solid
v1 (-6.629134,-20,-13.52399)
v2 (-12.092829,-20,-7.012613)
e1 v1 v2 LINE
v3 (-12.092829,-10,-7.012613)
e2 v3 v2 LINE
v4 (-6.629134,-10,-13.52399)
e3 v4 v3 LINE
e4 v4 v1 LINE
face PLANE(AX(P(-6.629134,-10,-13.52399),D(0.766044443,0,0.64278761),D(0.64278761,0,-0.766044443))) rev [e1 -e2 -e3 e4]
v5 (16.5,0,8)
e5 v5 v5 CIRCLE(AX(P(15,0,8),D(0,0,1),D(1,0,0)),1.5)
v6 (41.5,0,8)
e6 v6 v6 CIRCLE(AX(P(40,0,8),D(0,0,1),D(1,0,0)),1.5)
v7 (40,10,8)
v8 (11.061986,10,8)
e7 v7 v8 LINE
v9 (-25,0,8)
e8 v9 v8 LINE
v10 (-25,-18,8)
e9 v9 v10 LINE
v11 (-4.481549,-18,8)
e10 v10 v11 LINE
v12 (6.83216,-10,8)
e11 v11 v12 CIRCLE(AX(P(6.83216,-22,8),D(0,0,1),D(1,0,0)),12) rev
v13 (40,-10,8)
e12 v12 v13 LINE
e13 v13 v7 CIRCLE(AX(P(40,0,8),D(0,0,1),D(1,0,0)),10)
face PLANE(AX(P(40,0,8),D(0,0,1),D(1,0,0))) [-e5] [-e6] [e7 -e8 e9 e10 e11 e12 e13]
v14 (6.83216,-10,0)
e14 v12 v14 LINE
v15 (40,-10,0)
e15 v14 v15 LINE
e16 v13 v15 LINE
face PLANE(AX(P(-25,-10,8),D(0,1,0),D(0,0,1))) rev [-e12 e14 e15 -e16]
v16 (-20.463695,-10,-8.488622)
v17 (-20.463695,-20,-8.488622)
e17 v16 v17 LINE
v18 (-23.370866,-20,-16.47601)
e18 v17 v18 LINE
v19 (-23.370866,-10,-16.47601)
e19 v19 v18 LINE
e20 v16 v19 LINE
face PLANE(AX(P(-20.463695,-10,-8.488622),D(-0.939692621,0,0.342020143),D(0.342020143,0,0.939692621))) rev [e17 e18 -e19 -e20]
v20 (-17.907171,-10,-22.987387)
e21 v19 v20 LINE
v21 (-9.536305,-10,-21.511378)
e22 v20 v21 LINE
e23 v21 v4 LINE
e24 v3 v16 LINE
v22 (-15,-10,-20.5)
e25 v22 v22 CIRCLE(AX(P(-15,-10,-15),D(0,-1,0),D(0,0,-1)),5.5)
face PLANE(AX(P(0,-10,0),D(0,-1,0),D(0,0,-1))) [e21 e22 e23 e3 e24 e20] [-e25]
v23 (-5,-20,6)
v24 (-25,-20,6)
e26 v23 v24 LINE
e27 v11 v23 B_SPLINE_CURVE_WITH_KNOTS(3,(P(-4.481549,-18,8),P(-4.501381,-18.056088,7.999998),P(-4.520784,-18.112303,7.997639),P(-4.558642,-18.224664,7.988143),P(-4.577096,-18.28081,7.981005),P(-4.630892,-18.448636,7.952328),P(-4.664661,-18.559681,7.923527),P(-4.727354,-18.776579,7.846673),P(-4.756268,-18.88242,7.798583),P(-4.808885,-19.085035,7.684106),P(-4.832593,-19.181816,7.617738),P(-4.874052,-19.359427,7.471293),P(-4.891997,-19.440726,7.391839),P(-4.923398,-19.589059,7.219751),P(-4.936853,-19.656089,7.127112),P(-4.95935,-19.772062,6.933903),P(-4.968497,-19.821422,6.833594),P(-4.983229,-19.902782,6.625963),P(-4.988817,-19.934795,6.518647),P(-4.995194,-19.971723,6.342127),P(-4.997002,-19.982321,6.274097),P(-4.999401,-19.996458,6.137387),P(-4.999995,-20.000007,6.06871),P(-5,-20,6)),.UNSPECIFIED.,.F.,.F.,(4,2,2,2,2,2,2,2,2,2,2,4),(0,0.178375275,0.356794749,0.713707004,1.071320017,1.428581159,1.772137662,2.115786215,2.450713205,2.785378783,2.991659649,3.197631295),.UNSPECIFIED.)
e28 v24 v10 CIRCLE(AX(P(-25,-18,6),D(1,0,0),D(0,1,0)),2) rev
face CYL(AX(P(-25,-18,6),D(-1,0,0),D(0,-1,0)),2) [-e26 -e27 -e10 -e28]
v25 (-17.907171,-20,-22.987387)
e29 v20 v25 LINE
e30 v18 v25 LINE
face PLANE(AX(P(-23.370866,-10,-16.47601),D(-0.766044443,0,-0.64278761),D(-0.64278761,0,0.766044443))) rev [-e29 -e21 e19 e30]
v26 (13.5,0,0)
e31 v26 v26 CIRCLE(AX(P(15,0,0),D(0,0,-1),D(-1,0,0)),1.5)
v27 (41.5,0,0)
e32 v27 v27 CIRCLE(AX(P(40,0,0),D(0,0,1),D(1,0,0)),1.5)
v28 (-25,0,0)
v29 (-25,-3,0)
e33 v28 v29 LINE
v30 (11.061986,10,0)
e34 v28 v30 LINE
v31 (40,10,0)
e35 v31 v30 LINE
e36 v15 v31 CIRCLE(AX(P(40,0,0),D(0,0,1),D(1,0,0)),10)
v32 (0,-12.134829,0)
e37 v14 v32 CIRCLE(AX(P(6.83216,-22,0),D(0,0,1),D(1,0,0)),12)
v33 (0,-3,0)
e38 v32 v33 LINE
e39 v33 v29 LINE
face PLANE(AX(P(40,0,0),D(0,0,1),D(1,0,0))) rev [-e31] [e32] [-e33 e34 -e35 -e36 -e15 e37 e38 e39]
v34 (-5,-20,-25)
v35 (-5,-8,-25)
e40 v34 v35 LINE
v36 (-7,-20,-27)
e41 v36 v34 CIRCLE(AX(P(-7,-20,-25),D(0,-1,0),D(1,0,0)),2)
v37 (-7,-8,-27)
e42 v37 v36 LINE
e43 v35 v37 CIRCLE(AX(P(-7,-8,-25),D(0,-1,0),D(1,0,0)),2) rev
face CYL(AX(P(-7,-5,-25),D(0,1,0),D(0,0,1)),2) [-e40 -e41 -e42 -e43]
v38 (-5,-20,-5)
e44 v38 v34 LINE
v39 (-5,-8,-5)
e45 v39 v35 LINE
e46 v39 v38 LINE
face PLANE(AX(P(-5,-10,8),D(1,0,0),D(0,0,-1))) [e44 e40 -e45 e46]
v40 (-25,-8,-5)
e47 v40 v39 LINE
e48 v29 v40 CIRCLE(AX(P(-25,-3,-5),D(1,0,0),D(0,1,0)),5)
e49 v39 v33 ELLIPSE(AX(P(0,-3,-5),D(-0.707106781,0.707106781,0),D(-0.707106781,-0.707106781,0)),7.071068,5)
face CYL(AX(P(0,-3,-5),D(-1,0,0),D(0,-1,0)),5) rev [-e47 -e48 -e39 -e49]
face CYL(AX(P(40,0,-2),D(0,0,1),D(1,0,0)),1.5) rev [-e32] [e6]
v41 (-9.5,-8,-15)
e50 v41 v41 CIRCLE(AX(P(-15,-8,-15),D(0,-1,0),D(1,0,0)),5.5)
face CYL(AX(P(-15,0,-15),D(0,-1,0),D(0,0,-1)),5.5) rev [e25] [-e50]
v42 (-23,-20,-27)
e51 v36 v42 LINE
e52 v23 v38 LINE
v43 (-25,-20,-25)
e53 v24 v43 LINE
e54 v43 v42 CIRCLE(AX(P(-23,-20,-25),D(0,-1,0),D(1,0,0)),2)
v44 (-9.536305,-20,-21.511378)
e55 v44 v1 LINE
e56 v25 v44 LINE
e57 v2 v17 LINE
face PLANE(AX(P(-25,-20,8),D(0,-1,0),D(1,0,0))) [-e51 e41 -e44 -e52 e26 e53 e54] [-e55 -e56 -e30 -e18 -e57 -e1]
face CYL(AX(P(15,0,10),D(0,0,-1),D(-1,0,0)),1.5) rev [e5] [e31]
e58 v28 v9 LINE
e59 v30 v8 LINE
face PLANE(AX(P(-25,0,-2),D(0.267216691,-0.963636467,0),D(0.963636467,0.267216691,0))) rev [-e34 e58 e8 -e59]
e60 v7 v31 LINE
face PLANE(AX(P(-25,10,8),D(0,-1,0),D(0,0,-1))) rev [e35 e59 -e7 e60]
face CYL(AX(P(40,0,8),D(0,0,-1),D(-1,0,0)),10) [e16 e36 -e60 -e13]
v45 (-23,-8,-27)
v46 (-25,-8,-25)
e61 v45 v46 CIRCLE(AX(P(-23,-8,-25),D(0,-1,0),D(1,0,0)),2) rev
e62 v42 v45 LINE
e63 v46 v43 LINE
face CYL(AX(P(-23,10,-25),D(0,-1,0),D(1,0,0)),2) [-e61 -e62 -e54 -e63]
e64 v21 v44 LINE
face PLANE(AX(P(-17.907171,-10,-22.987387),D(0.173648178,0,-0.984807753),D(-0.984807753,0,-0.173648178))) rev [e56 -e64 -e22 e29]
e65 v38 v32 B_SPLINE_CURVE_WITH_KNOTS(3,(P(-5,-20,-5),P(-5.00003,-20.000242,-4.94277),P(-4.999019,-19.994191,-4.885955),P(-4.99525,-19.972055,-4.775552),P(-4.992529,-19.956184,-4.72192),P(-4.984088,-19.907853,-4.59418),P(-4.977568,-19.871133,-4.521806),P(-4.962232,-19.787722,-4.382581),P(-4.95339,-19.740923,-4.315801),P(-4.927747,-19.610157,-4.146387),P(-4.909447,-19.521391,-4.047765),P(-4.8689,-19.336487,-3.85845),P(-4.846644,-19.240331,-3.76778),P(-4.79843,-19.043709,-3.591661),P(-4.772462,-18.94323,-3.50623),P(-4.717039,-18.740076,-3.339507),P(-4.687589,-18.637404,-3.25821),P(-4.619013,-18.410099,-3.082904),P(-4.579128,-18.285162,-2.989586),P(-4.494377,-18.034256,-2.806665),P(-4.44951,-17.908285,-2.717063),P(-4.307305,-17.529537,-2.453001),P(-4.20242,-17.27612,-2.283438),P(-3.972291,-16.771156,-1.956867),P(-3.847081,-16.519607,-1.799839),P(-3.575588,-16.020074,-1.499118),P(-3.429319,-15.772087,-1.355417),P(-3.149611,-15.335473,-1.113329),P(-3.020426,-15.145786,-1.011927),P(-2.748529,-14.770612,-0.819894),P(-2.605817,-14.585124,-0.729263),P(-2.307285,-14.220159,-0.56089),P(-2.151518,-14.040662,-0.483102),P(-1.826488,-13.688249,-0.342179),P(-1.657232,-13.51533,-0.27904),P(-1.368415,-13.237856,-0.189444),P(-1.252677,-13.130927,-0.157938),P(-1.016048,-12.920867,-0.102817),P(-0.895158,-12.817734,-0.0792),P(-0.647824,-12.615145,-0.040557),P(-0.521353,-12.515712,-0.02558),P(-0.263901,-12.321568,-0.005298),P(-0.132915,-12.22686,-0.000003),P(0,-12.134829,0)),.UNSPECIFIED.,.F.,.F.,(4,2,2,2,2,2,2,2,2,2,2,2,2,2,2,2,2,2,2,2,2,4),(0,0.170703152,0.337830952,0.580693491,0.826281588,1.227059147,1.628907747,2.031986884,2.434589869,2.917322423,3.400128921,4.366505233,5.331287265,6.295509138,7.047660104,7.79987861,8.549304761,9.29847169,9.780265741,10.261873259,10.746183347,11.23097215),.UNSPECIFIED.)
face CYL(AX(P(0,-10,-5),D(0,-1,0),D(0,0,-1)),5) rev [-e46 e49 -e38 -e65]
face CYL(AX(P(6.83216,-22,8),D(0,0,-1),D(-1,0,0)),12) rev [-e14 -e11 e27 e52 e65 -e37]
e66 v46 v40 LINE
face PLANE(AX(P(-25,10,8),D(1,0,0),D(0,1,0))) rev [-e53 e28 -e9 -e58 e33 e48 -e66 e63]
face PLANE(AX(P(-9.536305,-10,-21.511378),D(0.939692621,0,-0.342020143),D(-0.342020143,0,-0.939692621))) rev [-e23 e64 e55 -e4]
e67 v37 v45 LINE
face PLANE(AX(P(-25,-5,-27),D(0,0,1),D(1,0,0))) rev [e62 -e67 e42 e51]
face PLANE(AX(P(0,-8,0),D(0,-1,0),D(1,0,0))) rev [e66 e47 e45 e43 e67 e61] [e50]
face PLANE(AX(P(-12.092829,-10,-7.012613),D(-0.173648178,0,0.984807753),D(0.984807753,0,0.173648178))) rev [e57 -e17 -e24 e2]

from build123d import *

# Parameters (mm, degrees)
BOSS_EXTRUDE1_DEPTH      = 8
SKETCH2_R                = 1.5
CUT_EXTRUDE1_DEPTH       = 10
SKETCH3_R                = 1.5
CUT_EXTRUDE2_DEPTH       = 10
BOSS_EXTRUDE3_DEPTH      = 30
BOSS_EXTRUDE3_DEPTH_BACK = 8
SKETCH6_W                = 20
SKETCH6_H                = 10
FILLET3_R                = 12
SKETCH7_W                = 20
SKETCH7_H                = 30
BOSS_EXTRUDE4_DEPTH      = 2
CUT_EXTRUDE3_DEPTH       = 10
SKETCH9_R                = 5.5
CUT_EXTRUDE4_DEPTH       = 10
FILLET4_R                = 5
FILLET5_R                = 2
CUT_EXTRUDE5_DEPTH       = 10
SKETCH11_W               = 20
SKETCH11_H               = 3
CUT_EXTRUDE6_DEPTH       = 15
FILLET6_R                = 2


with BuildPart() as part:
    # Sketch1 → Boss-Extrude1 (new body)
    with BuildSketch(Plane.XY):
        with BuildLine():
            Line((-25, 10), (40, 10))
            ThreePointArc((40, 10), (50, 0), (40, -10))
            Line((40, -10), (-25, -10))
            Line((-25, -10), (-25, 10))
        make_face()
    extrude(amount=BOSS_EXTRUDE1_DEPTH)

    # Sketch2 → Cut-Extrude1 (cut)
    with BuildSketch(Plane.XY.offset(8)):
        with Locations((40, 0)):
            Circle(SKETCH2_R)
    extrude(amount=-CUT_EXTRUDE1_DEPTH, mode=Mode.SUBTRACT)

    # Sketch3 → Cut-Extrude2 (cut)
    with BuildSketch(Plane(origin=(0, 0, 0), x_dir=(-1, 0, 0), z_dir=(0, 0, -1))):
        with Locations((-15, 0)):
            Circle(SKETCH3_R)
    extrude(amount=-CUT_EXTRUDE2_DEPTH, mode=Mode.SUBTRACT)

    # Sketch6 → Boss-Extrude3 (add, two sides: drawn at the far end of the back side and taken through both)
    with BuildSketch(Plane(origin=(0, 0, 0), x_dir=(-1, 0, 0), z_dir=(0, 0, -1)).offset(-BOSS_EXTRUDE3_DEPTH_BACK)):
        with Locations((15, -15)):
            Rectangle(SKETCH6_W, SKETCH6_H)
    extrude(amount=BOSS_EXTRUDE3_DEPTH + BOSS_EXTRUDE3_DEPTH_BACK)

    # Fillet3
    # the kernel refuses this fillet: 12 mm, written as the material it adds along each edge
    with BuildSketch(Plane(origin=(-5, -10, 8), x_dir=(0, -1, 0), z_dir=(0, 0, -1))) as fillet3_piece_1:
        with BuildLine():
            CenterArc((12, -11.832159566), FILLET3_R, 99.594068227, 80.405931773)
            Line((0, -11.832159566), (0, 0))
            Line((0, 0), (10, 0))
        make_face()
    extrude(amount=8)

    # Sketch7 → Boss-Extrude4 (add)
    with BuildSketch(Plane(origin=(0, -10, 0), x_dir=(1, 0, 0), z_dir=(0, 1, 0))):
        with Locations((-15, 15)):
            Rectangle(SKETCH7_W, SKETCH7_H)
    extrude(amount=BOSS_EXTRUDE4_DEPTH)

    # Sketch8 → Cut-Extrude3 (cut)
    with BuildSketch(Plane.XZ.offset(20)):
        Polygon((-12.092828782, -7.012612723), (-20.463694682, -8.488622233), (-23.370865901, -16.47600951), (-17.907171218, -22.987387277), (-9.536305318, -21.511377767), (-6.629134099, -13.52399049), align=None)
    extrude(amount=-CUT_EXTRUDE3_DEPTH, mode=Mode.SUBTRACT)

    # Sketch9 → Cut-Extrude4 (cut)
    with BuildSketch(Plane.XZ.offset(10)):
        with Locations(Location((-15, -15, 0), (0, 0, 270))):
            Circle(SKETCH9_R)
    extrude(amount=-CUT_EXTRUDE4_DEPTH, mode=Mode.SUBTRACT)

    # Fillet4
    # the kernel refuses this fillet: 5 mm, written as the material it adds along each edge
    with BuildSketch(Plane(origin=(-5, -20, 0), x_dir=(1, 0, 0), z_dir=(0, 1, 0))) as fillet4_piece_1_section:
        with BuildLine():
            CenterArc((FILLET4_R, FILLET4_R), FILLET4_R, 180, 90)
            Line((0, FILLET4_R), (0, 0))
            Line((0, 0), (FILLET4_R, 0))
        make_face()
    fillet4_piece_1 = extrude(amount=12, mode=Mode.PRIVATE)
    fillet4_piece_1 = fillet4_piece_1 - Plane(origin=(6.832159566, -22, 0), x_dir=(0, -1, 0), z_dir=(0, 0, 1)) * Cylinder(12, 44, mode=Mode.PRIVATE)
    add(fillet4_piece_1)
    with BuildSketch(Plane(origin=(-25, -8, 0), x_dir=(0, 1, 0), z_dir=(1, 0, 0))) as fillet4_piece_2:
        with BuildLine():
            CenterArc((FILLET4_R, -FILLET4_R), FILLET4_R, 90, 90)
            Line((0, -FILLET4_R), (0, 0))
            Line((0, 0), (FILLET4_R, 0))
        make_face()
    extrude(amount=20)
    with BuildSketch(Plane(origin=(-5, -20, 0), x_dir=(1, 0, 0), z_dir=(0, 1, 0))) as fillet4_piece_3a_section:
        with BuildLine():
            CenterArc((FILLET4_R, FILLET4_R), FILLET4_R, 180, 90)
            Line((0, FILLET4_R), (0, 0))
            Line((0, 0), (FILLET4_R, 0))
        make_face()
    fillet4_piece_3a = extrude(amount=24.5, mode=Mode.PRIVATE)
    fillet4_piece_3a = split(fillet4_piece_3a, bisect_by=Plane(origin=(-5, -8, 0), z_dir=(0, 1, 0)), keep=Keep.TOP, mode=Mode.PRIVATE)
    with BuildSketch(Plane(origin=(-25, -8, 0), x_dir=(0, 1, 0), z_dir=(1, 0, 0))) as fillet4_piece_3b_section:
        with BuildLine():
            CenterArc((FILLET4_R, -FILLET4_R), FILLET4_R, 90, 90)
            Line((0, -FILLET4_R), (0, 0))
            Line((0, 0), (FILLET4_R, 0))
        make_face()
    fillet4_piece_3b = extrude(amount=32.5, mode=Mode.PRIVATE)
    fillet4_piece_3b = split(fillet4_piece_3b, bisect_by=Plane(origin=(-5, -8, 0), z_dir=(1, 0, 0)), keep=Keep.TOP, mode=Mode.PRIVATE)
    fillet4_piece_3 = fillet4_piece_3a & fillet4_piece_3b
    add(fillet4_piece_3)

    # Fillet5
    fillet5_edges = [part.edges().sort_by_distance(p)[0] for p in [
        (-15, -20, 8),
        (-25, -14, -30),
        (-5, -14, -30),
        (-25, 10, 4),
    ]]
    fillet(fillet5_edges, radius=FILLET5_R)

    # Sketch10 → Cut-Extrude5 (cut)
    with BuildSketch(Plane.XY.offset(8)):
        with BuildLine():
            Line((-25, 0), (11.061986304, 10))
            Line((11.061986304, 10), (-23, 10))
            ThreePointArc((-23, 10), (-24.414213562, 9.414213562), (-25, 8))
            Line((-25, 8), (-25, 0))
        make_face()
    extrude(amount=-CUT_EXTRUDE5_DEPTH, mode=Mode.SUBTRACT)

    # Sketch11 → Cut-Extrude6 (cut)
    with BuildSketch(Plane.XZ.offset(20)):
        with Locations((-15, -28.5)):
            Rectangle(SKETCH11_W, SKETCH11_H)
    extrude(amount=-CUT_EXTRUDE6_DEPTH, mode=Mode.SUBTRACT)

    # Fillet6
    fillet6_edges = [part.edges().sort_by_distance(p)[0] for p in [
        (-25, -14, -27),
        (-5, -14, -27),
    ]]
    fillet(fillet6_edges, radius=FILLET6_R)


solid = part.part
